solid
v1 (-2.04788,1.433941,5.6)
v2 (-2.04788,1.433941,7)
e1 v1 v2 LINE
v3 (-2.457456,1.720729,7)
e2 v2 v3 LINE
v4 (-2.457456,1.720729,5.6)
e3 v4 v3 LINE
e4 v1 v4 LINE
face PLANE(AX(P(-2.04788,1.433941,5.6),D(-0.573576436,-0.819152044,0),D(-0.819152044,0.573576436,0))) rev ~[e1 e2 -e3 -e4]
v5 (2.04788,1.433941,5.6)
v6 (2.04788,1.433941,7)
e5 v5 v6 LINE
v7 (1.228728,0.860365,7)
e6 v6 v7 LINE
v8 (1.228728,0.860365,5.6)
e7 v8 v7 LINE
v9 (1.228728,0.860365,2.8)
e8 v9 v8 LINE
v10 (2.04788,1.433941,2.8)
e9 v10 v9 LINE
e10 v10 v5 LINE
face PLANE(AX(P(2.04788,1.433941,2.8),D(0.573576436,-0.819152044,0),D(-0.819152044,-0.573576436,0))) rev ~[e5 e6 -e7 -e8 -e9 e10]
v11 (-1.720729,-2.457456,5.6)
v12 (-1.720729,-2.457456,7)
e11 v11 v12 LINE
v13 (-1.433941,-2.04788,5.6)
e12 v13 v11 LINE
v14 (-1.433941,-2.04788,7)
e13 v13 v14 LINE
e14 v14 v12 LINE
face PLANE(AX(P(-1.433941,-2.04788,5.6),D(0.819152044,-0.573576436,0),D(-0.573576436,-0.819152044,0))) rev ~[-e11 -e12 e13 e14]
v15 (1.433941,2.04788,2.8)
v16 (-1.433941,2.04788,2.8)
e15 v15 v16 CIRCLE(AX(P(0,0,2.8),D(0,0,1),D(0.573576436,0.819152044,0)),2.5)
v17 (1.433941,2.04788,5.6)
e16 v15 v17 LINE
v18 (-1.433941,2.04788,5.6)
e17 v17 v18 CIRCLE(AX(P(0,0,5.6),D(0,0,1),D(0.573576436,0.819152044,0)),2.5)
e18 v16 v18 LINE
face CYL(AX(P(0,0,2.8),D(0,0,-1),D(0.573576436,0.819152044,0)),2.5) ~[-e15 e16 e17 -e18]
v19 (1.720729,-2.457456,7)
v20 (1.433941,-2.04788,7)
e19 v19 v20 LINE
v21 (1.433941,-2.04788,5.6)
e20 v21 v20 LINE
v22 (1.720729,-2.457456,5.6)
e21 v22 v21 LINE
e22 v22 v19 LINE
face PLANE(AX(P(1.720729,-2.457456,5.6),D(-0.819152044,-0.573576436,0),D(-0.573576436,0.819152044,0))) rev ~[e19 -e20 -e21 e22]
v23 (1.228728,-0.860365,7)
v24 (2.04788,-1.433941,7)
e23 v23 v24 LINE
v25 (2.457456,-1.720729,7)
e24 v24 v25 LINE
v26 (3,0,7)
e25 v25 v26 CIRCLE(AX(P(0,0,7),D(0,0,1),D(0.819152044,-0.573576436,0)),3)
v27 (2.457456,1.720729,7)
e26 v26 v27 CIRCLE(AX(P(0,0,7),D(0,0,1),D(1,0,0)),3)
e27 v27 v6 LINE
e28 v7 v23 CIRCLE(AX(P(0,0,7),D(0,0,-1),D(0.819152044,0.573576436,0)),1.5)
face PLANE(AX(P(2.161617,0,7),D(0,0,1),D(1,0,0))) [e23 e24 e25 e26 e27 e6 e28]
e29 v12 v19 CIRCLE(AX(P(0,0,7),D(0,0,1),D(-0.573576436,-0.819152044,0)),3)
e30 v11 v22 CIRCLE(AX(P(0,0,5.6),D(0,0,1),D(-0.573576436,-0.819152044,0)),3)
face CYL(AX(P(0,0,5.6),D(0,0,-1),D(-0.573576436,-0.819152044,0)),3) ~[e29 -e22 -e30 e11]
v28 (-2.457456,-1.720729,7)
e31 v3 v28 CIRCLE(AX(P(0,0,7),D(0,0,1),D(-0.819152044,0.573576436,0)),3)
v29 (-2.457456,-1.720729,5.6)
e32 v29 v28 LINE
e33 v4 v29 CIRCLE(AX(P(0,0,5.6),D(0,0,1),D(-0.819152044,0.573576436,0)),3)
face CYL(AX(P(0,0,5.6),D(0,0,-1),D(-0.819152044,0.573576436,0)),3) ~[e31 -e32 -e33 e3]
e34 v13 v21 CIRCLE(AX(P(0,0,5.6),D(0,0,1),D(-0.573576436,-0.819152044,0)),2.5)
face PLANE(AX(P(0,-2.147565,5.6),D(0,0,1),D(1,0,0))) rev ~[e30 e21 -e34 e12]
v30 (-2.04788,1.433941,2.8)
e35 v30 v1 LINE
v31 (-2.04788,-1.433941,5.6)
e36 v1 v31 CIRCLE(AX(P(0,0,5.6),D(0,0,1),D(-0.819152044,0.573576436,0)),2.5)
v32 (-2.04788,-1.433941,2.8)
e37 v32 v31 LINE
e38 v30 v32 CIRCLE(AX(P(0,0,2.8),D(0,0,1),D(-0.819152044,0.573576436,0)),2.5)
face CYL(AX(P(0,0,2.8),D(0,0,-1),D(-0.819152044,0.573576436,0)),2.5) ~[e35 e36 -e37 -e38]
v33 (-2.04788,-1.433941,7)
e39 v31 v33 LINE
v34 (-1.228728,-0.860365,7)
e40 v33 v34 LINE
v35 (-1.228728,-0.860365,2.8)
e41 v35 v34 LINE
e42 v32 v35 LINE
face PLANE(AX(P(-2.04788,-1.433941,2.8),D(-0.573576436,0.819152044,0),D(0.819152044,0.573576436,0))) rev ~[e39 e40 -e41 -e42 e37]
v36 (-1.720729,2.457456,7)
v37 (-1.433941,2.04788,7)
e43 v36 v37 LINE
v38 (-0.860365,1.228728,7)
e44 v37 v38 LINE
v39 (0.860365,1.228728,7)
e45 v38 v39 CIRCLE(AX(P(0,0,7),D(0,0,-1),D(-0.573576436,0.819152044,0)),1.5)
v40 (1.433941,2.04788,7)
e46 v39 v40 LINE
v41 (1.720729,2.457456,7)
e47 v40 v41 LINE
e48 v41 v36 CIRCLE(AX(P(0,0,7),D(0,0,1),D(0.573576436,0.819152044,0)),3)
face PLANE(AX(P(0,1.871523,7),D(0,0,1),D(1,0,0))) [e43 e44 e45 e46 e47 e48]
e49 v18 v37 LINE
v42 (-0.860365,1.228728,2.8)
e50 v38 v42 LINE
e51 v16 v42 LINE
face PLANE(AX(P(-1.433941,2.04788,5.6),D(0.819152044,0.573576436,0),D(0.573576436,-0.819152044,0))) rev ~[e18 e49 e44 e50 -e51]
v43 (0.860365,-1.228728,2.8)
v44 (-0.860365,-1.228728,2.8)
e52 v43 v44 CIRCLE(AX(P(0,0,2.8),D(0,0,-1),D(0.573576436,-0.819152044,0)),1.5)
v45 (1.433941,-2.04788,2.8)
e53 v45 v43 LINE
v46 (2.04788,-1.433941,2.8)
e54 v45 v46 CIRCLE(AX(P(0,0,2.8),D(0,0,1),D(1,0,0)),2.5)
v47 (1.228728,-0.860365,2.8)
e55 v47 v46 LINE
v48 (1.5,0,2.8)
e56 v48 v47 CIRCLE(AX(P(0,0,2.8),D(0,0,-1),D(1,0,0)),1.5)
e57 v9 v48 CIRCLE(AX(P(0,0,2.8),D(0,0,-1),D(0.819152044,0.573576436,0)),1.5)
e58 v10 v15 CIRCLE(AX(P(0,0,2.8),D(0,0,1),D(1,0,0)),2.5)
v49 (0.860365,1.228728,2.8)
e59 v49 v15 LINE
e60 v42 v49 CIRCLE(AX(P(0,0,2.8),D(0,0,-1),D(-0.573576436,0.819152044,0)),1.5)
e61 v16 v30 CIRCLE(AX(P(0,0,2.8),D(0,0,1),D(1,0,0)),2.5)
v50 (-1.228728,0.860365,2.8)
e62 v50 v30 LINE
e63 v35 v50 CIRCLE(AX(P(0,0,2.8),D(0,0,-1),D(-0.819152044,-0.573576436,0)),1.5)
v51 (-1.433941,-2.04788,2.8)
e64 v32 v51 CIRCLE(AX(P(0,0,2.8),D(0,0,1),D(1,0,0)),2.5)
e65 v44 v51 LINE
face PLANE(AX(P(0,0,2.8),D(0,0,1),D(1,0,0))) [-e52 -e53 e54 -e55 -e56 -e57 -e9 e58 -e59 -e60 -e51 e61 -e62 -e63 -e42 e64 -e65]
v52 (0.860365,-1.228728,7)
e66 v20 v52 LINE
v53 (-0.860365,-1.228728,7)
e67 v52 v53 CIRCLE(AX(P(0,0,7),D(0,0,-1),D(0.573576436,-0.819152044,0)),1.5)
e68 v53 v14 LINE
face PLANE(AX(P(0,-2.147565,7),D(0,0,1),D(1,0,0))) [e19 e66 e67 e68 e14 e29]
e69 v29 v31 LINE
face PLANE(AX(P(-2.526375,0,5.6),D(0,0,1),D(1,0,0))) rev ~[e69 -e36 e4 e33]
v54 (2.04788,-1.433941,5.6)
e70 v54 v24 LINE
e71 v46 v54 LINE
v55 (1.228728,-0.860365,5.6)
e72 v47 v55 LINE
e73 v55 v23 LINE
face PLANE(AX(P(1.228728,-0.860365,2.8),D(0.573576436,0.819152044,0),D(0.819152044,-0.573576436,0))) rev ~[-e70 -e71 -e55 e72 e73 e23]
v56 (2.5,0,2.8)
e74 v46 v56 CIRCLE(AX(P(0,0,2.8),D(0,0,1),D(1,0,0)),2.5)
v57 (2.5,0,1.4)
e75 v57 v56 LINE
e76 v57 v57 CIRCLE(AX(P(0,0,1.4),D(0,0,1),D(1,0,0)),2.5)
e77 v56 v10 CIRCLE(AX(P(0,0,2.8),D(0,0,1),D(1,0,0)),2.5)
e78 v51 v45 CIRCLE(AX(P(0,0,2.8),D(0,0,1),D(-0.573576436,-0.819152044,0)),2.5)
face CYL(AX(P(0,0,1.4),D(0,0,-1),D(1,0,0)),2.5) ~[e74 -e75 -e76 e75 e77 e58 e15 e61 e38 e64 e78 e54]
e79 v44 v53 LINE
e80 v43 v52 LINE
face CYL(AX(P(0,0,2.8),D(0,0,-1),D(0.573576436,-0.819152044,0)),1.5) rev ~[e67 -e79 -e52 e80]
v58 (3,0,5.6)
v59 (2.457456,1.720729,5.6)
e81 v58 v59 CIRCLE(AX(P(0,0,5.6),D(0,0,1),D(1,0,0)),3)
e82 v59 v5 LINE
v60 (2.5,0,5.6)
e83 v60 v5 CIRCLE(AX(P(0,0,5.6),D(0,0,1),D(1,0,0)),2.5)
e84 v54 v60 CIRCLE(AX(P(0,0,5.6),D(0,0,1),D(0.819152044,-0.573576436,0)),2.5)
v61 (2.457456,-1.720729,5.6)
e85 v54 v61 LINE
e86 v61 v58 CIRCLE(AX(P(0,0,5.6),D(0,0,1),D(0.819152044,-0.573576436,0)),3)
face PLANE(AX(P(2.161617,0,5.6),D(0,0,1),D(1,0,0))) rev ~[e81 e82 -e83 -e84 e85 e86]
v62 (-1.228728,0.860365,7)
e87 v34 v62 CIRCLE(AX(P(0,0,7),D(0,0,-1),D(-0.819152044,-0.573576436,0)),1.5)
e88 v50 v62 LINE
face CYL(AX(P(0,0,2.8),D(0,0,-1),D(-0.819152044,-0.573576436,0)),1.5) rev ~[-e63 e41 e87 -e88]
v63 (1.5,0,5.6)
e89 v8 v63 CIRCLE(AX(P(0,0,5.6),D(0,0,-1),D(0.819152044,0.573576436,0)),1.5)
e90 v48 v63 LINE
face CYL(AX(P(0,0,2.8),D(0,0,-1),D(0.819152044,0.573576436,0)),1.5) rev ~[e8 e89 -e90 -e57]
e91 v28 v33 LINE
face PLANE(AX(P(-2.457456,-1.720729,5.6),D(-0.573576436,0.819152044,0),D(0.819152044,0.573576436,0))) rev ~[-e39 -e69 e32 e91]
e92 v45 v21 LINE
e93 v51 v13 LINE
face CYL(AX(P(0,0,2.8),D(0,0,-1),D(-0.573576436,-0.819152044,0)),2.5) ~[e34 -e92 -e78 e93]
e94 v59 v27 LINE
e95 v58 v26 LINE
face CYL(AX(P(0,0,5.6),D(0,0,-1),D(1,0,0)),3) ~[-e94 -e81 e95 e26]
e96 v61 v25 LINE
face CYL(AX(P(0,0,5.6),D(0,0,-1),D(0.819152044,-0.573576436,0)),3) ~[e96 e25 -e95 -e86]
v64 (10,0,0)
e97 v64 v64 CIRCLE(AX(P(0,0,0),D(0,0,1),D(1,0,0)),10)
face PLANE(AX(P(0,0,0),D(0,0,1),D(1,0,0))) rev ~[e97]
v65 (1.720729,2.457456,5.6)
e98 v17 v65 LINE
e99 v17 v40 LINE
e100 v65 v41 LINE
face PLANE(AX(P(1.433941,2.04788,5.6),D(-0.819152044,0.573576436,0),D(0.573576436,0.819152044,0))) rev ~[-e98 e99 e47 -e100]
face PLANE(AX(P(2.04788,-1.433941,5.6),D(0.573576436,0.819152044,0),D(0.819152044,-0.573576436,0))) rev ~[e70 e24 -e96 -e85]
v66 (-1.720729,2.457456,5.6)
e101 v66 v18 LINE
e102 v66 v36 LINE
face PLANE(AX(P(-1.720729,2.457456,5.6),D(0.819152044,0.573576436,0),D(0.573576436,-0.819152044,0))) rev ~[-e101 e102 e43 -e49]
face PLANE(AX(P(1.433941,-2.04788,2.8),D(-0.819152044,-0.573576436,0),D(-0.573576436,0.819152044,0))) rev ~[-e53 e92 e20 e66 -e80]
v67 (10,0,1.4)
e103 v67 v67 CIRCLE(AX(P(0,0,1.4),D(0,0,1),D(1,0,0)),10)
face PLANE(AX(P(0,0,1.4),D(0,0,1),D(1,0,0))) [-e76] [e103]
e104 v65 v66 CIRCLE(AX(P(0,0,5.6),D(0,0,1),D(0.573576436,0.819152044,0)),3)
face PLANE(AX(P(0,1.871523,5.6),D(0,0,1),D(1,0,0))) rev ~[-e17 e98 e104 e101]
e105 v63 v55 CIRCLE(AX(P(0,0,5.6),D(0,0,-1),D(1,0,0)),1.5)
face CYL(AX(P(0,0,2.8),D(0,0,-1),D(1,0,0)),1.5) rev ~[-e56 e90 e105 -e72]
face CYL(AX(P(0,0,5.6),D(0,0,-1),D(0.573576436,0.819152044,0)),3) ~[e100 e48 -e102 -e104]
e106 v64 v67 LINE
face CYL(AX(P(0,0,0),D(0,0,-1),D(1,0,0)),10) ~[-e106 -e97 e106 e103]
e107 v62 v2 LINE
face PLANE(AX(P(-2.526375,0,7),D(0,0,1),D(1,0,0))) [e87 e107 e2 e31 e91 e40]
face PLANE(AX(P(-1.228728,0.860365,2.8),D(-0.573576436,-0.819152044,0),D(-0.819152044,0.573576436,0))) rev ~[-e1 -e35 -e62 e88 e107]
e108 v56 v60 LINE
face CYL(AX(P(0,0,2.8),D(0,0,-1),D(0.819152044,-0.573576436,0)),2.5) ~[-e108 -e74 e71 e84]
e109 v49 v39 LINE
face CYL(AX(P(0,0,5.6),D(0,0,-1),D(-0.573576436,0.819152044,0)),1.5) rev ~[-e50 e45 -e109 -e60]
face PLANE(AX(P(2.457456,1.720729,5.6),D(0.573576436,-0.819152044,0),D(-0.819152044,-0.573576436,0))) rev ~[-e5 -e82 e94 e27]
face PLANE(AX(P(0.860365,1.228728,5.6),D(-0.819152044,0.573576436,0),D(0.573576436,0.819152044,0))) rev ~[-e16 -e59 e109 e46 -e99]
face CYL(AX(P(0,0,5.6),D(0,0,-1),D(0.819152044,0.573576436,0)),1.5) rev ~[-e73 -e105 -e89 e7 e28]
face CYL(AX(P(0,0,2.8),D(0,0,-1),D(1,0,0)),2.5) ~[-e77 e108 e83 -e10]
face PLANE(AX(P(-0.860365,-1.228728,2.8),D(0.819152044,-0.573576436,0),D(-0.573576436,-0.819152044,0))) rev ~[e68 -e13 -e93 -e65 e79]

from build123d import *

# Parameters (mm, degrees)
F0_R     = 10
F1_DEPTH = 1.4
F2_R     = 2.5
F3_DEPTH = 1.4
F5_DEPTH = 2.8
F7_DEPTH = 1.4


with BuildPart() as f1:
    # F0 (on Top) → F1 (new body)
    with BuildSketch(Plane.XY):
        Circle(F0_R)
    extrude(amount=F1_DEPTH)

    # F2 (on face) → F3 (join)
    with BuildSketch(Plane.XY.offset(1.4)):
        Circle(F2_R)
    extrude(amount=F3_DEPTH)

    # F4 (on face) → F5 (join)
    with BuildSketch(Plane.XY.offset(2.8)):
        with BuildLine():
            Line((-2.0478801107, -1.4339410909), (-1.2287280664, -0.8603646545))
            ThreePointArc((-1.2287280664, -0.8603646545), (-1.5, 0), (-1.2287280664, 0.8603646545))
            Line((-1.2287280664, 0.8603646545), (-2.0478801107, 1.4339410909))
            ThreePointArc((-2.0478801107, 1.4339410909), (-2.5, 0), (-2.0478801107, -1.4339410909))
        make_face()
        with BuildLine():
            ThreePointArc((-0.8603646545, 1.2287280664), (0, 1.5), (0.8603646545, 1.2287280664))
            Line((0.8603646545, 1.2287280664), (1.4339410909, 2.0478801107))
            ThreePointArc((1.4339410909, 2.0478801107), (0, 2.5), (-1.4339410909, 2.0478801107))
            Line((-1.4339410909, 2.0478801107), (-0.8603646545, 1.2287280664))
        make_face()
        with BuildLine():
            ThreePointArc((1.2287280664, 0.8603646545), (1.4305754261, 0.4510586993), (1.5, 0))
            ThreePointArc((1.5, 0), (1.4305754261, -0.4510586993), (1.2287280664, -0.8603646545))
            Line((1.2287280664, -0.8603646545), (2.0478801107, -1.4339410909))
            ThreePointArc((2.0478801107, -1.4339410909), (2.3842923769, -0.7517644988), (2.5, 0))
            ThreePointArc((2.5, 0), (2.3842923769, 0.7517644988), (2.0478801107, 1.4339410909))
            Line((2.0478801107, 1.4339410909), (1.2287280664, 0.8603646545))
        make_face()
        with BuildLine():
            Line((1.4339410909, -2.0478801107), (0.8603646545, -1.2287280664))
            ThreePointArc((0.8603646545, -1.2287280664), (0, -1.5), (-0.8603646545, -1.2287280664))
            Line((-0.8603646545, -1.2287280664), (-1.4339410909, -2.0478801107))
            ThreePointArc((-1.4339410909, -2.0478801107), (0, -2.5), (1.4339410909, -2.0478801107))
        make_face()
    extrude(amount=F5_DEPTH)

    # F6 (on face) → F7 (join)
    with BuildSketch(Plane.XY.offset(5.6)):
        with BuildLine():
            ThreePointArc((-0.8603646545, 1.2287280664), (0, 1.5), (0.8603646545, 1.2287280664))
            Line((0.8603646545, 1.2287280664), (1.4339410909, 2.0478801107))
            ThreePointArc((1.4339410909, 2.0478801107), (0, 2.5), (-1.4339410909, 2.0478801107))
            Line((-1.4339410909, 2.0478801107), (-0.8603646545, 1.2287280664))
        make_face()
        with BuildLine():
            ThreePointArc((-1.4339410909, 2.0478801107), (0, 2.5), (1.4339410909, 2.0478801107))
            Line((1.4339410909, 2.0478801107), (1.7207293091, 2.4574561329))
            ThreePointArc((1.7207293091, 2.4574561329), (0, 3), (-1.7207293091, 2.4574561329))
            Line((-1.7207293091, 2.4574561329), (-1.4339410909, 2.0478801107))
        make_face()
        with BuildLine():
            ThreePointArc((3, 0), (2.8611508522, 0.9021173985), (2.4574561329, 1.7207293091))
            Line((2.4574561329, 1.7207293091), (2.0478801107, 1.4339410909))
            Line((2.0478801107, 1.4339410909), (1.2287280664, 0.8603646545))
            ThreePointArc((1.2287280664, 0.8603646545), (1.5, 0), (1.2287280664, -0.8603646545))
            Line((1.2287280664, -0.8603646545), (2.0478801107, -1.4339410909))
            Line((2.0478801107, -1.4339410909), (2.4574561329, -1.7207293091))
            ThreePointArc((2.4574561329, -1.7207293091), (2.8611508522, -0.9021173985), (3, 0))
        make_face()
        with BuildLine():
            Line((-2.0478801107, 1.4339410909), (-2.4574561329, 1.7207293091))
            ThreePointArc((-2.4574561329, 1.7207293091), (-3, 0), (-2.4574561329, -1.7207293091))
            Line((-2.4574561329, -1.7207293091), (-2.0478801107, -1.4339410909))
            ThreePointArc((-2.0478801107, -1.4339410909), (-2.5, 0), (-2.0478801107, 1.4339410909))
        make_face()
        with BuildLine():
            Line((-1.2287280664, 0.8603646545), (-2.0478801107, 1.4339410909))
            ThreePointArc((-2.0478801107, 1.4339410909), (-2.5, 0), (-2.0478801107, -1.4339410909))
            Line((-2.0478801107, -1.4339410909), (-1.2287280664, -0.8603646545))
            ThreePointArc((-1.2287280664, -0.8603646545), (-1.5, 0), (-1.2287280664, 0.8603646545))
        make_face()
        with BuildLine():
            Line((-1.4339410909, -2.0478801107), (-1.7207293091, -2.4574561329))
            ThreePointArc((-1.7207293091, -2.4574561329), (0, -3), (1.7207293091, -2.4574561329))
            Line((1.7207293091, -2.4574561329), (1.4339410909, -2.0478801107))
            Line((1.4339410909, -2.0478801107), (0.8603646545, -1.2287280664))
            ThreePointArc((0.8603646545, -1.2287280664), (0, -1.5), (-0.8603646545, -1.2287280664))
            Line((-0.8603646545, -1.2287280664), (-1.4339410909, -2.0478801107))
        make_face()
    extrude(amount=F7_DEPTH)


solid = f1.part
